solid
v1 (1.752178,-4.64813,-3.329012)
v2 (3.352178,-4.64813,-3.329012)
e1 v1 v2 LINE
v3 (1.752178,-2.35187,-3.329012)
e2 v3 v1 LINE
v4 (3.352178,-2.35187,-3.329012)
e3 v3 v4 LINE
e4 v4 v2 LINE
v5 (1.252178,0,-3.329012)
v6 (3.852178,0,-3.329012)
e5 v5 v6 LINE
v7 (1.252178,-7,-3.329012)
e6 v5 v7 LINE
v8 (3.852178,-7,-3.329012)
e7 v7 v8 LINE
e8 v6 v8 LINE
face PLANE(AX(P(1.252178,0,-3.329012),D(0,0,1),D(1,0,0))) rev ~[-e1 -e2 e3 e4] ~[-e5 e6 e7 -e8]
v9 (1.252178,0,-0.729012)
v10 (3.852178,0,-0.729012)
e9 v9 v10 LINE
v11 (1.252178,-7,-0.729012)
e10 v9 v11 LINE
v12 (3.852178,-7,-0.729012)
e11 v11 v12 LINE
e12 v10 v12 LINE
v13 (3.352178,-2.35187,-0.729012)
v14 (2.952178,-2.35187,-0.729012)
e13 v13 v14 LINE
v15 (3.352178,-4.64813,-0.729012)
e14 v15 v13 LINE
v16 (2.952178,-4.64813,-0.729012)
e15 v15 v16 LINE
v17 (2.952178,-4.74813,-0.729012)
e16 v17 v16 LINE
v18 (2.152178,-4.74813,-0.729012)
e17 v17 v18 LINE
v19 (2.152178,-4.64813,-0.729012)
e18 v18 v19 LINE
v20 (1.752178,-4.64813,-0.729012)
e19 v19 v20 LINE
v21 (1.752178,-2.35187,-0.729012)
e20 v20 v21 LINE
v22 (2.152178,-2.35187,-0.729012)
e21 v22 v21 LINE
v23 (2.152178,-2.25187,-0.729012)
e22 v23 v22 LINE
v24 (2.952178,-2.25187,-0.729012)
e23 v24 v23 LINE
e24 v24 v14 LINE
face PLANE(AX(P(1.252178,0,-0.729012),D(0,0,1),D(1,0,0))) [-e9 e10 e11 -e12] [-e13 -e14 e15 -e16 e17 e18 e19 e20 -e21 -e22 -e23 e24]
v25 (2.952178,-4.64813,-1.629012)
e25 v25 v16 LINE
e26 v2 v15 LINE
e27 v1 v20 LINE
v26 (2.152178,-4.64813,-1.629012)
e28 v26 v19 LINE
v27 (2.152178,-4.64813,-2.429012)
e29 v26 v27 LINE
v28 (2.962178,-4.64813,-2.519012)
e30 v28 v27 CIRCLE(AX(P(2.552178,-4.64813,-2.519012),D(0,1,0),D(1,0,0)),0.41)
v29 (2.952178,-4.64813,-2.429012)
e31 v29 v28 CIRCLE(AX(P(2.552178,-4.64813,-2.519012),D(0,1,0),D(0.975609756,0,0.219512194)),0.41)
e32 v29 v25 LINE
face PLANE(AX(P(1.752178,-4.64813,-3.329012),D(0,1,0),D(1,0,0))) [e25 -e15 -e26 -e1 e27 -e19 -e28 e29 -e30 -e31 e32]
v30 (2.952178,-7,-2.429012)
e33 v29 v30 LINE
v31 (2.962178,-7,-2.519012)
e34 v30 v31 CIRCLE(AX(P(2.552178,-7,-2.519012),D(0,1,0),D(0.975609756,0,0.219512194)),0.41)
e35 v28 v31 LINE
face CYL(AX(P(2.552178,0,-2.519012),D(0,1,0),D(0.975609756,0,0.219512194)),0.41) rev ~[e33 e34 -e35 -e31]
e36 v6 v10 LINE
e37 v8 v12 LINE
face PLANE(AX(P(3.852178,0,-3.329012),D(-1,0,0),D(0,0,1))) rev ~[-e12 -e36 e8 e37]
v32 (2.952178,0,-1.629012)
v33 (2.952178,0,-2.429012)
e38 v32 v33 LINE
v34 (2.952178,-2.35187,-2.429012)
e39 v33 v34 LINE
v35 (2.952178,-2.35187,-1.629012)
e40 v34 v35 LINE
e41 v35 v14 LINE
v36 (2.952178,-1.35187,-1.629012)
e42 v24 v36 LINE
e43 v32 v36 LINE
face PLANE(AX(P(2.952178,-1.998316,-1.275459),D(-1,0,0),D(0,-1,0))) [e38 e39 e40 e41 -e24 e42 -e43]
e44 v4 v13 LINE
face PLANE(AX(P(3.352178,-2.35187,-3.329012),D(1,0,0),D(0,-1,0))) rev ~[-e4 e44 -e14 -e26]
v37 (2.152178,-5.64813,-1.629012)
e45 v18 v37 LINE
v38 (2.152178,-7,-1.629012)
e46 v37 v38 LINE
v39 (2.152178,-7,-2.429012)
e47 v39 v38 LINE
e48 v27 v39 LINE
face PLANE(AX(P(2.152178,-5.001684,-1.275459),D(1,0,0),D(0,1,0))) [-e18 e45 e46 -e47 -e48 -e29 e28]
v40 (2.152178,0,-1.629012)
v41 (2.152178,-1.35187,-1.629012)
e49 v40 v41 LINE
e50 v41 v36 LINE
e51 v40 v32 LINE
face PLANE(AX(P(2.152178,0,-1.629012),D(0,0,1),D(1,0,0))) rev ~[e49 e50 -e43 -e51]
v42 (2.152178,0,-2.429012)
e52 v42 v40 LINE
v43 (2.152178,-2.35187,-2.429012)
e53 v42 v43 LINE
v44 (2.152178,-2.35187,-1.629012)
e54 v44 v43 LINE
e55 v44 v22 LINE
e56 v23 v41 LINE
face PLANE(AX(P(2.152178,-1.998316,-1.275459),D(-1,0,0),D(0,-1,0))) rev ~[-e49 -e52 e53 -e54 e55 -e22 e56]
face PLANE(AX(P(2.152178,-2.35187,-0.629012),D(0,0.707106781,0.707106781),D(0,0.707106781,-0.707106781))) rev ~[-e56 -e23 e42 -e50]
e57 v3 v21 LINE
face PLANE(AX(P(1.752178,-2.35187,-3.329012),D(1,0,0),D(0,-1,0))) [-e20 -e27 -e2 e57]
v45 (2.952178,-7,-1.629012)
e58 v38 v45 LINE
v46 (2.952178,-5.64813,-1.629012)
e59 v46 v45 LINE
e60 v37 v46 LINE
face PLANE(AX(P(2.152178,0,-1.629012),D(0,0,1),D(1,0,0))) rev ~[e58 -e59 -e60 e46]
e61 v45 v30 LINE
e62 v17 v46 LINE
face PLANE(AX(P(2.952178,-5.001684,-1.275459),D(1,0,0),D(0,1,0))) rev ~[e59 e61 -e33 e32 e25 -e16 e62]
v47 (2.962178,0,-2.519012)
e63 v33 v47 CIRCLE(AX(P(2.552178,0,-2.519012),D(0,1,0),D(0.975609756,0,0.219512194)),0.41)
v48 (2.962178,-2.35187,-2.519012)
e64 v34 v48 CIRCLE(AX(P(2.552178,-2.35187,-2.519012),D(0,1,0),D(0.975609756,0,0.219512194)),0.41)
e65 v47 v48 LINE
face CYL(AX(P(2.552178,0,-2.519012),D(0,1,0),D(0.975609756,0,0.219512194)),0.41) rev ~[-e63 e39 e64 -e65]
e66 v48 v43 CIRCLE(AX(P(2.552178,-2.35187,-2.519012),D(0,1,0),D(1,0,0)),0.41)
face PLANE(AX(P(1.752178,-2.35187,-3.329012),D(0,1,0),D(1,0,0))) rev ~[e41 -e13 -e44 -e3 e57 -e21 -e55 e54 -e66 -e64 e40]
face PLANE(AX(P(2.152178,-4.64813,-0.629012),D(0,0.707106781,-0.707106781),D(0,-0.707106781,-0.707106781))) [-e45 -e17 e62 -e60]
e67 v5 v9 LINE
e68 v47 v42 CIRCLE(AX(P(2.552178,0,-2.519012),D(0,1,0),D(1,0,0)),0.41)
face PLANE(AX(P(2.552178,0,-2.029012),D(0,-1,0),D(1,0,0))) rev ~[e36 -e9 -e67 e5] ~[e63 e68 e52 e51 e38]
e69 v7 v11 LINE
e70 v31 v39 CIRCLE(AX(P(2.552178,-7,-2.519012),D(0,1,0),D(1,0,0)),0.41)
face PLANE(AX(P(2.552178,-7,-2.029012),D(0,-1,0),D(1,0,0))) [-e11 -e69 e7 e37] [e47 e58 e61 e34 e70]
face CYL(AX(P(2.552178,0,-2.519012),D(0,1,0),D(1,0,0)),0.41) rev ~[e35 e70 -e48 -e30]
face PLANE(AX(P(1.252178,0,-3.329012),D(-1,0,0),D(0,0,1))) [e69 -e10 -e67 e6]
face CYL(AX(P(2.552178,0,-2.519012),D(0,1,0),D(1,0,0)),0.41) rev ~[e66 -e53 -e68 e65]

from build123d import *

# Parameters (mm, degrees)
F0_W        = 2.6
F0_H        = 2.6
F1_DEPTH    = 7
F2_W        = 1.6
F2_H        = 2.2962607759
F3_DEPTH    = 25
F4_T1_DEPTH = 0.8


# Not quite as in the source:
# - a fillet or chamfer that OpenCascade refuses, or shapes differently, is made with other operations: its cross-section is extruded or revolved along the edge and cut away or added


with BuildPart() as f1:
    # F0 (on Front) → F1 (new body)
    with BuildSketch(Plane.XZ):
        with Locations((2.5521775242, -2.0290124111)):
            Rectangle(F0_W, F0_H)
        with BuildLine():
            Line((2.1521775242, -2.4290124111), (2.1521775242, -1.6290124111))
            Line((2.1521775242, -1.6290124111), (2.9521775242, -1.6290124111))
            Line((2.9521775242, -1.6290124111), (2.9521775242, -2.4290124111))
            ThreePointArc((2.9521775242, -2.4290124111), (2.9596698554, -2.4737354854), (2.9621775242, -2.5190124111))
            ThreePointArc((2.9621775242, -2.5190124111), (2.5069005985, -2.9265047423), (2.1521775242, -2.4290124111))
        make_face(mode=Mode.SUBTRACT)
    extrude(amount=F1_DEPTH)

    # F2 (on face) → F3 (cut)
    with BuildSketch(Plane(origin=(0, 0, -3.3290124111), x_dir=(1, 0, 0), z_dir=(0, 0, -1))):
        with Locations((2.5521775242, 3.5)):
            Rectangle(F2_W, F2_H)
    extrude(amount=-F3_DEPTH, mode=Mode.SUBTRACT)

    # F4: chamfer of 1 on 2 edges, made by hand

    # F4_s2 → F4_t1 (cut)
    with BuildSketch(Plane.YZ.offset(2.1521775242)):
        Polygon((-2.351869612, -0.6290124111), (-1.351869612, -1.6290124111), (-2.351869612, -1.6290124111), align=None)
        Polygon((-4.648130388, -0.6290124111), (-5.648130388, -1.6290124111), (-4.648130388, -1.6290124111), align=None)
    extrude(amount=F4_T1_DEPTH, mode=Mode.SUBTRACT)


solid = f1.part
